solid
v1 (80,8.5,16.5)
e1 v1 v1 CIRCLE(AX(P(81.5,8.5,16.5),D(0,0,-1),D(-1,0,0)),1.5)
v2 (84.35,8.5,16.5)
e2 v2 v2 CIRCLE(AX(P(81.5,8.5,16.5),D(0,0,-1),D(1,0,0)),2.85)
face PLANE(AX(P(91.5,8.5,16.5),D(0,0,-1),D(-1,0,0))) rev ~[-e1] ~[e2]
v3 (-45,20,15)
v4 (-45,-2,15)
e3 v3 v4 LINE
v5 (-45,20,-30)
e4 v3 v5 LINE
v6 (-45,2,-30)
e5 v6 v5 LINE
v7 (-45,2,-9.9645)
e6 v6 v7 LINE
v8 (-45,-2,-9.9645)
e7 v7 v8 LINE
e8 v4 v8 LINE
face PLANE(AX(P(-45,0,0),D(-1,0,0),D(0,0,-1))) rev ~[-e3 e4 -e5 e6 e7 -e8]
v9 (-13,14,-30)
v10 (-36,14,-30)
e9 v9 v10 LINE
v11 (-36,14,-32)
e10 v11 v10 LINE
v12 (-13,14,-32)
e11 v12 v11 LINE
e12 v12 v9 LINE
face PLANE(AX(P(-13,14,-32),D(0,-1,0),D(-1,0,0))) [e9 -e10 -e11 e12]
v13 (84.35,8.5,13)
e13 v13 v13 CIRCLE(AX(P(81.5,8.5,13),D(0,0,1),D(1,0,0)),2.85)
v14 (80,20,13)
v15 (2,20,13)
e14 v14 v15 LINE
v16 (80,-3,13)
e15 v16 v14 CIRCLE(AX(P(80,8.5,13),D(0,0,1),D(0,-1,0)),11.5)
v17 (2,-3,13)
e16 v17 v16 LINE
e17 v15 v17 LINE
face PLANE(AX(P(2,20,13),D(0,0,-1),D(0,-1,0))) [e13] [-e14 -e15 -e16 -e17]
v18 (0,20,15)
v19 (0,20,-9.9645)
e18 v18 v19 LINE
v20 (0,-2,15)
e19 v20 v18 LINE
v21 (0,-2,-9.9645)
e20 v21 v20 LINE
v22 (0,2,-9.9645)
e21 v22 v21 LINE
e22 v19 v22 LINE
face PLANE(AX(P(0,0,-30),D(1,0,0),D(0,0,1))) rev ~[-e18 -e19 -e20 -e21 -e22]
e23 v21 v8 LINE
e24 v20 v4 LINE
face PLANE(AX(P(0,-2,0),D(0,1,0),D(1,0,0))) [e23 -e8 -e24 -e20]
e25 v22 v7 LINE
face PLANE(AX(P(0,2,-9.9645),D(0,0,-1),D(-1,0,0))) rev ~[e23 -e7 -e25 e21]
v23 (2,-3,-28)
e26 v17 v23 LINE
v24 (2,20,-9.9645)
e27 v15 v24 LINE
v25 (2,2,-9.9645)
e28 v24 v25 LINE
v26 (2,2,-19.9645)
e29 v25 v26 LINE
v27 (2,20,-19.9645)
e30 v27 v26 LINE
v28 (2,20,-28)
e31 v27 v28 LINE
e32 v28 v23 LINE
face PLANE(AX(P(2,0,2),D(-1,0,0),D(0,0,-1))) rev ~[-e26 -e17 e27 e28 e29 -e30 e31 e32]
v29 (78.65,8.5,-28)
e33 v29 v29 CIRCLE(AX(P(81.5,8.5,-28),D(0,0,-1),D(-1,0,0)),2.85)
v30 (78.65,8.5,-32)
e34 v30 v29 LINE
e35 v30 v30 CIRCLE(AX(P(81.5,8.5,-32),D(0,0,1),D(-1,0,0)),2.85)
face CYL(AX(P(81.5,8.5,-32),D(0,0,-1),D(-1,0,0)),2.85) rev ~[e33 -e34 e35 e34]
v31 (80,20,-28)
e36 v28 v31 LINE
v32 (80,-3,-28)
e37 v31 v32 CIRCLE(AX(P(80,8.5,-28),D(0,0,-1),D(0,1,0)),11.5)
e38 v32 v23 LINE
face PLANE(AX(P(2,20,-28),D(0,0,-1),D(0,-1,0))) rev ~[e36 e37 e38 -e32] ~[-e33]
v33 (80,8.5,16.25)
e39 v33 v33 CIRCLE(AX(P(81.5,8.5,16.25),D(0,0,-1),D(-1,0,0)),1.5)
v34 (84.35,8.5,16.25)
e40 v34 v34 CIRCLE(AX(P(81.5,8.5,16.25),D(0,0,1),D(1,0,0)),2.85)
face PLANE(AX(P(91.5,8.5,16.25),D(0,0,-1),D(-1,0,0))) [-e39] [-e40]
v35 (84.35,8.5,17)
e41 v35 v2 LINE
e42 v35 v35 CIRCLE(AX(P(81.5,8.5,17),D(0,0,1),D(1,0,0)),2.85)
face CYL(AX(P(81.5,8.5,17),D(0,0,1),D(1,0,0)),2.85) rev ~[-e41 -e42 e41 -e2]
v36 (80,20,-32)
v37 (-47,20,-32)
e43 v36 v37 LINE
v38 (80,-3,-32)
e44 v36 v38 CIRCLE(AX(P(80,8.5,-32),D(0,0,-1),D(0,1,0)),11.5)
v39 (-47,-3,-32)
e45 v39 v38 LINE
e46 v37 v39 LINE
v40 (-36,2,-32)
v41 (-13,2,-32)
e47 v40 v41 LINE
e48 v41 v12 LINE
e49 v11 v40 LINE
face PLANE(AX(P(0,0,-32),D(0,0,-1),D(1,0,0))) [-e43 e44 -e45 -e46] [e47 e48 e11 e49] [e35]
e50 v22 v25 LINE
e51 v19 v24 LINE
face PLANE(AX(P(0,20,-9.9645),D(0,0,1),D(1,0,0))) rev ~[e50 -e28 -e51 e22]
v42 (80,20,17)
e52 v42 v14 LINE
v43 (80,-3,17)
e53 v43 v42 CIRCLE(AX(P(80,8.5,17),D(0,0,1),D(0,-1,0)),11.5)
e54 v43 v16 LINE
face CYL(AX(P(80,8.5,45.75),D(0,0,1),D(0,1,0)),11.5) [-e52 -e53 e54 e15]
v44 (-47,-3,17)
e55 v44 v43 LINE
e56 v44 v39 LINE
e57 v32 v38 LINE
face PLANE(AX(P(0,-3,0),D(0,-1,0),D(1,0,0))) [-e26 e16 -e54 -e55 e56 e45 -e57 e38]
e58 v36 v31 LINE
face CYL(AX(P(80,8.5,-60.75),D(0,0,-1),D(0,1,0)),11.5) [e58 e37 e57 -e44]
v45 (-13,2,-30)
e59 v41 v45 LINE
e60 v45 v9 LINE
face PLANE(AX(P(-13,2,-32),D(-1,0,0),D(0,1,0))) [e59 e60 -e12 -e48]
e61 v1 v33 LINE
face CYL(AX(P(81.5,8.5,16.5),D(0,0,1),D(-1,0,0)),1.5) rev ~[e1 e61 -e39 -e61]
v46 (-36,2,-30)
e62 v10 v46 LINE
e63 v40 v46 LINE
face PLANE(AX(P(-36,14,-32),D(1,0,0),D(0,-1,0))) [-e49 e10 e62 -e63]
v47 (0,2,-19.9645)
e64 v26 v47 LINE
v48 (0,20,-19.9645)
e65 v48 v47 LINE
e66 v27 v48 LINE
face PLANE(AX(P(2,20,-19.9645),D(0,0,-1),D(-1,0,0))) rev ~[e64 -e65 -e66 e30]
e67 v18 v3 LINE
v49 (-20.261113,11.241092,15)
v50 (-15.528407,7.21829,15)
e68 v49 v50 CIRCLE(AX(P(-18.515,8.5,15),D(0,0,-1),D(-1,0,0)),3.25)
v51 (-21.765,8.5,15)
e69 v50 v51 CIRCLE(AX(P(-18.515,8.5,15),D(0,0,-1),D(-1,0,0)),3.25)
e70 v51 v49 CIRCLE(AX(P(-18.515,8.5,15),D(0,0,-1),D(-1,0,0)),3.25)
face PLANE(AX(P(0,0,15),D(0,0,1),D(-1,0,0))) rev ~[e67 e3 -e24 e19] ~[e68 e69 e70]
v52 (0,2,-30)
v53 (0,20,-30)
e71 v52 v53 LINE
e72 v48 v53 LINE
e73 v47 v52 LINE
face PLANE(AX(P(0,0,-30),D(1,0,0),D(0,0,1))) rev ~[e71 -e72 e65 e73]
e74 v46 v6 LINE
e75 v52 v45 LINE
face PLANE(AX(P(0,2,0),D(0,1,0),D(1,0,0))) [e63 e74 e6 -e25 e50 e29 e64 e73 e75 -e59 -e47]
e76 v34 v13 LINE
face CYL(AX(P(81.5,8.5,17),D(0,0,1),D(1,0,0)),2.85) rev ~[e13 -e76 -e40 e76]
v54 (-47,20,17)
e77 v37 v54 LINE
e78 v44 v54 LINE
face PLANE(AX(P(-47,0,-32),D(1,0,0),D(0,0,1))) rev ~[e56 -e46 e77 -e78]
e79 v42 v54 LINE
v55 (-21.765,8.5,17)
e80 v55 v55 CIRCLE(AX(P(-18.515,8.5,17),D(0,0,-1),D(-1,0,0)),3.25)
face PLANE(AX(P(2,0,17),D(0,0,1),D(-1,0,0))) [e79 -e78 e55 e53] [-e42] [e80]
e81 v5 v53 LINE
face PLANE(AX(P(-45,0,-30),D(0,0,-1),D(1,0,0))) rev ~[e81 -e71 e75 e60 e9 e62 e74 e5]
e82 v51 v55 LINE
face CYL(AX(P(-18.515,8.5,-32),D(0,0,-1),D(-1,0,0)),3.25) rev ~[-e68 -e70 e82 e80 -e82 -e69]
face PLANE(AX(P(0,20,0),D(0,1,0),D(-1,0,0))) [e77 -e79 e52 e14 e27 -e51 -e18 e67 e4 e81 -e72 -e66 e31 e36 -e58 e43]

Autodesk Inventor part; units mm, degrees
ref_plane "YZ Plane" through (0, 0, 0) normal (1, 0, 0) x (0, 1, 0)
ref_plane "XZ Plane" through (0, 0, 0) normal (0, 1, 0) x (-1, 0, 0)
ref_plane "XY Plane" through (0, 0, 0) normal (0, 0, 1) x (1, 0, 0)
sketch "Szkic1" plane through (0, 0, 0) normal (0, 1, 0) x (-1, 0, 0)
  line L0 (0, 0) -> (45, 0)
  line L1 (45, 0) -> (45, -30)
  line L2 (45, -30) -> (0, -30)
  line L3 (0, -30) -> (0, 0)
  line L4 (45, 0) -> (45, 2)
  line L5 (45, 2) -> (47, 2)
  line L6 (0, -30) -> (0, -32)
  line L7 (0, -32) -> (-2, -32)
  line L8 (-2, -32) -> (47, -32)
  line L9 (47, -32) -> (47, 2)
  line L10 (47, 2) -> (-2, 2)
  line L11 (-2, 2) -> (-2, -32)
  line L12 (47, 2) -> (47, 17)
  line L13 (-2, 2) -> (-2, 17)
  line L14 (-2, 17) -> (47, 17)
  line L15 (-2, 17) -> (-2, 15)
  line L16 (-2, 15) -> (47, 15)
  line L17 (47, 17) -> (47, 14.5669)
  line L18 (0, 2) -> (0, 15)
  line L19 (45, 2) -> (45, 15)
  line L20 (0, 0) -> (0, 2)
  line L21 (45, 0) -> (45, 2)
  dimension "d0" = 45
  dimension "d1" = 30
  dimension "d2" = 2
  dimension "d3" = 2
  dimension "d4" = 2
  dimension "d5" = 2
  dimension "d40" = 15
  dimension "d41" = 15
  dimension "d42" = 2
extrude "Wyciągnięcie proste1" add sketch "Szkic1" along normal blind 20 contours L3 L6 L7 L11 L10 L20 | L4 L5 L9 L8 L6 L2 L1 | L10 L13 L16 L18 | L19 L16 L12 L5 | L16 L13 L14 L12
sketch "Szkic2" plane through (0, 0, 0) normal (0, -1, 0) x (1, 0, 0)
  line L0 (-47, 2) -> (2, 2) projected
  line L1 (-47, -32) -> (-47, 17) projected
  line L2 (2, 2) -> (-47, 2)
  line L3 (-47, 2) -> (-47, -32)
  line L4 (-47, -32) -> (2, -32)
  line L5 (2, -32) -> (2, 2)
  point P0 (0, 0)
extrude "Wyciągnięcie proste2" add sketch "Szkic2" against normal blind 2
sketch "Szkic3" plane through (2, 0, -32) normal (0, 0, -1) x (-1, 0, 0)
  line L0 (40, 2) -> (15, 2)
  line L1 (15, 2) -> (15, 14)
  line L2 (15, 14) -> (40, 14)
  line L3 (40, 14) -> (40, 2)
  line L4 (40, 14) -> (38, 14)
  line L5 (38, 14) -> (38, 2)
  line L6 (38, 2) -> (40, 2)
  line L7 (40, 2) -> (40, 14)
  point P0 (2, 0)
  dimension "d10" = 25
  dimension "d11" = 12
  dimension "d30" = 2
extrude "Wyciągnięcie proste3" cut sketch "Szkic3" against normal blind 4.5 contours L0 L1 L2 L5
sketch "Szkic4" plane through (0, 20, 0) normal (0, 0, -1) x (-1, 0, 0)
  line L0 (38, -6) -> (38, -18) projected
  line L1 (38, -12) -> (28, -12)
  line L2 (28, -12) -> (30.5, -12)
  circle A0 centre (30.5, -12) radius 4.5
  line L3 (13, -6) -> (36, -6) projected
  line L4 (24.5, -6) -> (24.5, -18)
  line L5 (0, -18) -> (45, -18) projected
  line L6 (11, -12) -> (21, -12)
  circle A1 centre (18.5, -12) radius 4.5
  point P0 (0, -20)
  dimension "d14" = 10
  dimension "d15" = 2.5
  dimension "d16" = 9
extrude "Wyciągnięcie proste4" [suppressed]
sketch "Szkic5" plane through (0, 20, 0) normal (0, 1, 0) x (1, 0, 0)
  line L0 (0, 30) -> (0, 0) projected
  line L1 (2, -17) -> (2, 32) projected
  line L2 (0, 9.9645) -> (2, 9.9645)
  line L3 (2, 9.9645) -> (2, 19.9645)
  line L4 (2, 19.9645) -> (0, 19.9645)
  line L5 (0, 19.9645) -> (0, 9.9645)
  point P0 (2, -2)
  dimension "d19" = 10
extrude "Wyciągnięcie proste5" cut sketch "Szkic5" against normal blind 18
sketch "Szkic6" plane through (-47, 0, 2) normal (0, 0, 1) x (1, 0, 0)
  circle A0 centre (28.5, 8) radius 4.5 projected
  line L0 (28.5, 8) -> (28.5, -2)
  circle A1 centre (28.5, 8) radius 3.5
  circle A2 centre (28.5, 8) radius 4.5
  point P0 (47, 0)
  dimension "d22" = 10
  dimension "d27" = 7
sketch "Szkic7" plane through (0, 0, 0) normal (0, -1, 0) x (1, 0, 0)
  line L0 (2, 17) -> (2, -32) projected
  line L1 (-47, -32) -> (2, -32)
  line L2 (2, -32) -> (2, 2)
  line L3 (2, 2) -> (-47, 2)
  line L4 (-47, 2) -> (-47, -32)
  line L5 (-47, 17) -> (2, 17) projected
  line L6 (-47, 0) -> (2, 0)
  line L7 (2, 0) -> (2, 17)
  line L8 (2, 17) -> (-47, 17)
  line L9 (-47, 17) -> (-47, 0)
  point P0 (0, 0)
extrude "Wyciągnięcie proste6" add sketch "Szkic7" along normal blind 3
sketch "Szkic8" plane through (0, 2, 0) normal (0, 1, 0) x (1, 0, 0)
  line L0 (-45, -2) -> (-45, 30) projected
  line L1 (0, 9.9645) -> (0, 0) projected
  line L2 (-45, 0) -> (0, 0)
  line L3 (0, 0) -> (0, 9.9645)
  line L4 (0, 9.9645) -> (-45, 9.9645)
  line L5 (-45, 9.9645) -> (-45, 0)
extrude "Wyciągnięcie proste7" cut sketch "Szkic8" against normal blind 4
extrude "Wyciągnięcie proste8" [suppressed]
sketch "Szkic9" plane through (2, 20, -32) normal (0, 0, -1) x (-1, 0, 0)
  line L0 (15, -6) -> (15, -18) projected
  line L1 (15, -12) -> (20.5, -12)
  circle A0 centre (20.5, -12) radius 3.5
  line L2 (0, -20) -> (0, -23) projected
  line L3 (0, -11.5) -> (29.45, -11.5)
  line L4 (0, -11.5) -> (23.29, -11.5)
  line L5 (23.29, -11.5) -> (20.94, -11.5)
  line L6 (20.94, -11.5) -> (20.94, -12)
  circle A1 centre (20.94, -12) radius 3.5
  point P0 (2, -20)
  point P1 (0, 0)
  dimension "d31" = 5.5
  dimension "d32" = 7
  dimension "d35" = 29.45
  dimension "d36" = 23.29
  dimension "d37" = 2.35
  dimension "d38" = 7
extrude "Wyciągnięcie proste9" cut sketch "Szkic9" against normal blind 47.25 contours A1 L3 A0 | A0 L3 A1 | L3 A0 A1 | A0 L3 A1 picked at (24.181, -11.2212) picked at (22.5407, -11.0097) picked at (22.6367, -12.1539) picked at (24.2617, -12.2698)
sketch "Szkic11" plane through (0, -2, 0) normal (0, 1, 0) x (1, 0, 0)
  line L0 (0, -15) -> (-45, -15) projected
  line L1 (-45, 9.9645) -> (-45, 30) projected
  line L2 (0, -15) -> (-45, -15)
  line L3 (-45, -15) -> (-45, 9.9645)
  line L4 (-45, 9.9645) -> (0, 9.9645)
  line L5 (0, 9.9645) -> (0, -15)
  point P0 (0, 0)
extrude "Wyciągnięcie proste10" cut sketch "Szkic11" along normal blind 43.5
sketch "Szkic12" plane through (-18.94, 8, 15.25) normal (0, 0, -1) x (-1, 0, 0)
  point P0 (-18.94, -8)
sketch "Szkic14" plane through (2, 20, -32) normal (0, 0, -1) x (-1, 0, 0)
  line L0 (0, -23) -> (0, 0) projected
  line L1 (0, -11.5) -> (29.51, -11.5)
  line L2 (0, -11.5) -> (29.51, -11.5) construction
  line L3 (29.51, -11.5) -> (18.2, -11.5)
  line L4 (18.2, -11.5) -> (20.515, -11.5)
  circle A0 centre (20.515, -11.5) radius 3.25
  point P0 (2, -20)
  dimension "d47" = 29.51
  dimension "d48" = 0
  dimension "d49" = 11.31
  dimension "d50" = 2.315
  dimension "d51" = 6.5
extrude "Wyciągnięcie proste11" cut sketch "Szkic14" against normal through all
sketch "Szkic15" plane through (0, 20, 15) normal (0, 0, -1) x (-1, 0, 0)
  arc A0 (20.2611, -8.7589) -> (15.5284, -12.7817) centre (18.515, -11.5) ccw projected
  circle A1 centre (18.515, -11.5) radius 3.25
  arc A2 (15.5284, -12.7817) -> (20.2611, -8.7589) centre (18.94, -12) ccw
  arc A3 (15.5284, -12.7817) -> (20.2611, -8.7589) centre (18.94, -12) ccw projected
  point P0 (0, -20)
  point P1 (15.5284, -12.7817)
extrude "Wyciągnięcie proste12" add sketch "Szkic15" against normal blind 2 contours A2 A1
sketch "Szkic16" plane through (2, 2, -9.9645) normal (1, 0, 0) x (0, 0, -1)
  line L0 (22.0355, 18) -> (22.0355, -5) projected
  line L1 (22.0355, -5) -> (-26.9645, -5) projected
  line L2 (22.0355, 18) -> (18.0355, 18)
  line L3 (18.0355, 18) -> (18.0355, -5)
  line L4 (18.0355, -5) -> (22.0355, -5)
  line L5 (22.0355, -5) -> (22.0355, 18)
  line L6 (-26.9645, 18) -> (-22.9645, 18)
  line L7 (-22.9645, 18) -> (-22.9645, -5)
  line L8 (-22.9645, -5) -> (-26.9645, -5)
  line L9 (-26.9645, -5) -> (-26.9645, 18)
  point P0 (-9.9645, -2)
  point P1 (-22.9645, -5)
  dimension "d56" = 4
  dimension "d57" = 4
sketch "Szkic17" plane through (2, 20, -32) normal (0, 0, -1) x (-1, 0, 0)
  circle A0 centre (20.515, -11.5) radius 3.25 projected
  line L0 (20.515, -11.5) -> (-79.485, -11.5)
  point P0 (2, -20)
  dimension "d58" = 100
extrude "Wyciągnięcie proste13" add sketch "Szkic16" along normal blind 79.5
sketch "Szkic18" plane through (-47, -3, -32) normal (0, 0, -1) x (-1, 0, 0)
  line L0 (-128.5, 0) -> (-128.5, 23) projected
  circle A0 centre (-128.5, 11.5) radius 2.85
  line L1 (-128.5, 11.5) -> (-118.5, 11.5)
  line L2 (-118.5, 11.5) -> (-118.5, 5)
  line L3 (-118.5, 5) -> (-146.5, 5)
  line L4 (-146.5, 18) -> (-118.5, 18)
  line L5 (-118.5, 18) -> (-118.5, 11.5)
  line L6 (-128.5, 18) -> (-128.5, 5)
  line L7 (-138.5, 11.5) -> (-138.5, 5)
  line L8 (-138.5, 5) -> (-110.5, 5)
  line L9 (-110.5, 5) -> (-110.5, 18)
  line L10 (-110.5, 18) -> (-138.5, 18)
  line L11 (-138.5, 18) -> (-138.5, 11.5)
  point P0 (-47, 3)
  dimension "d61" = 5.7
  dimension "d62" = 10
  dimension "d63" = 6.5
  dimension "d64" = 28
  dimension "d65" = 13
sketch "Szkic19" plane through (81.5, 2, -9.9645) normal (1, 0, 0) x (0, 0, -1)
  line L0 (-26.9645, -5) -> (-26.9645, 18) projected
  line L1 (-26.9645, -5) -> (22.0355, -5) projected
  line L2 (-26.9645, 18) -> (-22.9645, 18)
  line L3 (-22.9645, 18) -> (-22.9645, -5)
  line L4 (-22.9645, -5) -> (-26.9645, -5)
  line L5 (-26.9645, -5) -> (-26.9645, 18)
  line L6 (22.0355, 18) -> (18.0355, 18)
  line L7 (18.0355, 18) -> (18.0355, -5)
  line L8 (18.0355, -5) -> (22.0355, -5)
  line L9 (22.0355, -5) -> (22.0355, 18)
  point P0 (-9.9645, -2)
  dimension "d66" = 4
  dimension "d67" = 4
extrude "Wyciągnięcie proste14" add sketch "Szkic19" along normal blind 10
extrude "Wyciągnięcie proste15" cut sketch "Szkic18" against normal blind 11.5 contours A0 L0 | L0 L1 A0 | L0 A0 L1
sketch "Szkic20" plane through (-47, -3, 17) normal (0, 0, 1) x (1, 0, 0)
  point P0 (47, 3)
sketch "Szkic21" plane through (-47, -3, 17) normal (0, 0, 1) x (1, 0, 0)
  circle A0 centre (128.5, 11.5) radius 2.85 projected
  circle A1 centre (128.5, 11.5) radius 2.95
  point P0 (47, 3)
  dimension "d72" = 5.9
extrude "Wyciągnięcie proste16" cut sketch "Szkic21" against normal blind 25.25 contours A0
fillet "Zaokrąglenie1" radius 11.5 4 edges at (91.5, 20, -30) (91.5, -3, -30) (91.5, 20, 15) (91.5, -3, 15)
ref_plane "Płaszczyzna konstrukcyjna2" through (91.5, 8.5, 16.5) normal (0, 0, -1) x (-1, 0, 0)
ref_plane "Płaszczyzna konstrukcyjna1" through (91.5, 8.5, 17) normal (0, 0, -1) x (-1, 0, 0)
sketch "Szkic22" plane through (91.5, 8.5, 16.5) normal (0, 0, -1) x (-1, 0, 0)
  circle A0 centre (10, 0) radius 2.85 projected
  circle A1 centre (10, 0) radius 1.5
  circle A2 centre (10, 0) radius 2.85
  point P0 (91.5, -8.5)
  dimension "d77" = 3
extrude "Wyciągnięcie proste17" add sketch "Szkic22" along normal blind 0.25
sketch "Szkic23" plane through (0, 20, 0) normal (0, 1, 0) x (1, 0, 0)
  point P0 (0, 0)
properties part number "servo_box"
